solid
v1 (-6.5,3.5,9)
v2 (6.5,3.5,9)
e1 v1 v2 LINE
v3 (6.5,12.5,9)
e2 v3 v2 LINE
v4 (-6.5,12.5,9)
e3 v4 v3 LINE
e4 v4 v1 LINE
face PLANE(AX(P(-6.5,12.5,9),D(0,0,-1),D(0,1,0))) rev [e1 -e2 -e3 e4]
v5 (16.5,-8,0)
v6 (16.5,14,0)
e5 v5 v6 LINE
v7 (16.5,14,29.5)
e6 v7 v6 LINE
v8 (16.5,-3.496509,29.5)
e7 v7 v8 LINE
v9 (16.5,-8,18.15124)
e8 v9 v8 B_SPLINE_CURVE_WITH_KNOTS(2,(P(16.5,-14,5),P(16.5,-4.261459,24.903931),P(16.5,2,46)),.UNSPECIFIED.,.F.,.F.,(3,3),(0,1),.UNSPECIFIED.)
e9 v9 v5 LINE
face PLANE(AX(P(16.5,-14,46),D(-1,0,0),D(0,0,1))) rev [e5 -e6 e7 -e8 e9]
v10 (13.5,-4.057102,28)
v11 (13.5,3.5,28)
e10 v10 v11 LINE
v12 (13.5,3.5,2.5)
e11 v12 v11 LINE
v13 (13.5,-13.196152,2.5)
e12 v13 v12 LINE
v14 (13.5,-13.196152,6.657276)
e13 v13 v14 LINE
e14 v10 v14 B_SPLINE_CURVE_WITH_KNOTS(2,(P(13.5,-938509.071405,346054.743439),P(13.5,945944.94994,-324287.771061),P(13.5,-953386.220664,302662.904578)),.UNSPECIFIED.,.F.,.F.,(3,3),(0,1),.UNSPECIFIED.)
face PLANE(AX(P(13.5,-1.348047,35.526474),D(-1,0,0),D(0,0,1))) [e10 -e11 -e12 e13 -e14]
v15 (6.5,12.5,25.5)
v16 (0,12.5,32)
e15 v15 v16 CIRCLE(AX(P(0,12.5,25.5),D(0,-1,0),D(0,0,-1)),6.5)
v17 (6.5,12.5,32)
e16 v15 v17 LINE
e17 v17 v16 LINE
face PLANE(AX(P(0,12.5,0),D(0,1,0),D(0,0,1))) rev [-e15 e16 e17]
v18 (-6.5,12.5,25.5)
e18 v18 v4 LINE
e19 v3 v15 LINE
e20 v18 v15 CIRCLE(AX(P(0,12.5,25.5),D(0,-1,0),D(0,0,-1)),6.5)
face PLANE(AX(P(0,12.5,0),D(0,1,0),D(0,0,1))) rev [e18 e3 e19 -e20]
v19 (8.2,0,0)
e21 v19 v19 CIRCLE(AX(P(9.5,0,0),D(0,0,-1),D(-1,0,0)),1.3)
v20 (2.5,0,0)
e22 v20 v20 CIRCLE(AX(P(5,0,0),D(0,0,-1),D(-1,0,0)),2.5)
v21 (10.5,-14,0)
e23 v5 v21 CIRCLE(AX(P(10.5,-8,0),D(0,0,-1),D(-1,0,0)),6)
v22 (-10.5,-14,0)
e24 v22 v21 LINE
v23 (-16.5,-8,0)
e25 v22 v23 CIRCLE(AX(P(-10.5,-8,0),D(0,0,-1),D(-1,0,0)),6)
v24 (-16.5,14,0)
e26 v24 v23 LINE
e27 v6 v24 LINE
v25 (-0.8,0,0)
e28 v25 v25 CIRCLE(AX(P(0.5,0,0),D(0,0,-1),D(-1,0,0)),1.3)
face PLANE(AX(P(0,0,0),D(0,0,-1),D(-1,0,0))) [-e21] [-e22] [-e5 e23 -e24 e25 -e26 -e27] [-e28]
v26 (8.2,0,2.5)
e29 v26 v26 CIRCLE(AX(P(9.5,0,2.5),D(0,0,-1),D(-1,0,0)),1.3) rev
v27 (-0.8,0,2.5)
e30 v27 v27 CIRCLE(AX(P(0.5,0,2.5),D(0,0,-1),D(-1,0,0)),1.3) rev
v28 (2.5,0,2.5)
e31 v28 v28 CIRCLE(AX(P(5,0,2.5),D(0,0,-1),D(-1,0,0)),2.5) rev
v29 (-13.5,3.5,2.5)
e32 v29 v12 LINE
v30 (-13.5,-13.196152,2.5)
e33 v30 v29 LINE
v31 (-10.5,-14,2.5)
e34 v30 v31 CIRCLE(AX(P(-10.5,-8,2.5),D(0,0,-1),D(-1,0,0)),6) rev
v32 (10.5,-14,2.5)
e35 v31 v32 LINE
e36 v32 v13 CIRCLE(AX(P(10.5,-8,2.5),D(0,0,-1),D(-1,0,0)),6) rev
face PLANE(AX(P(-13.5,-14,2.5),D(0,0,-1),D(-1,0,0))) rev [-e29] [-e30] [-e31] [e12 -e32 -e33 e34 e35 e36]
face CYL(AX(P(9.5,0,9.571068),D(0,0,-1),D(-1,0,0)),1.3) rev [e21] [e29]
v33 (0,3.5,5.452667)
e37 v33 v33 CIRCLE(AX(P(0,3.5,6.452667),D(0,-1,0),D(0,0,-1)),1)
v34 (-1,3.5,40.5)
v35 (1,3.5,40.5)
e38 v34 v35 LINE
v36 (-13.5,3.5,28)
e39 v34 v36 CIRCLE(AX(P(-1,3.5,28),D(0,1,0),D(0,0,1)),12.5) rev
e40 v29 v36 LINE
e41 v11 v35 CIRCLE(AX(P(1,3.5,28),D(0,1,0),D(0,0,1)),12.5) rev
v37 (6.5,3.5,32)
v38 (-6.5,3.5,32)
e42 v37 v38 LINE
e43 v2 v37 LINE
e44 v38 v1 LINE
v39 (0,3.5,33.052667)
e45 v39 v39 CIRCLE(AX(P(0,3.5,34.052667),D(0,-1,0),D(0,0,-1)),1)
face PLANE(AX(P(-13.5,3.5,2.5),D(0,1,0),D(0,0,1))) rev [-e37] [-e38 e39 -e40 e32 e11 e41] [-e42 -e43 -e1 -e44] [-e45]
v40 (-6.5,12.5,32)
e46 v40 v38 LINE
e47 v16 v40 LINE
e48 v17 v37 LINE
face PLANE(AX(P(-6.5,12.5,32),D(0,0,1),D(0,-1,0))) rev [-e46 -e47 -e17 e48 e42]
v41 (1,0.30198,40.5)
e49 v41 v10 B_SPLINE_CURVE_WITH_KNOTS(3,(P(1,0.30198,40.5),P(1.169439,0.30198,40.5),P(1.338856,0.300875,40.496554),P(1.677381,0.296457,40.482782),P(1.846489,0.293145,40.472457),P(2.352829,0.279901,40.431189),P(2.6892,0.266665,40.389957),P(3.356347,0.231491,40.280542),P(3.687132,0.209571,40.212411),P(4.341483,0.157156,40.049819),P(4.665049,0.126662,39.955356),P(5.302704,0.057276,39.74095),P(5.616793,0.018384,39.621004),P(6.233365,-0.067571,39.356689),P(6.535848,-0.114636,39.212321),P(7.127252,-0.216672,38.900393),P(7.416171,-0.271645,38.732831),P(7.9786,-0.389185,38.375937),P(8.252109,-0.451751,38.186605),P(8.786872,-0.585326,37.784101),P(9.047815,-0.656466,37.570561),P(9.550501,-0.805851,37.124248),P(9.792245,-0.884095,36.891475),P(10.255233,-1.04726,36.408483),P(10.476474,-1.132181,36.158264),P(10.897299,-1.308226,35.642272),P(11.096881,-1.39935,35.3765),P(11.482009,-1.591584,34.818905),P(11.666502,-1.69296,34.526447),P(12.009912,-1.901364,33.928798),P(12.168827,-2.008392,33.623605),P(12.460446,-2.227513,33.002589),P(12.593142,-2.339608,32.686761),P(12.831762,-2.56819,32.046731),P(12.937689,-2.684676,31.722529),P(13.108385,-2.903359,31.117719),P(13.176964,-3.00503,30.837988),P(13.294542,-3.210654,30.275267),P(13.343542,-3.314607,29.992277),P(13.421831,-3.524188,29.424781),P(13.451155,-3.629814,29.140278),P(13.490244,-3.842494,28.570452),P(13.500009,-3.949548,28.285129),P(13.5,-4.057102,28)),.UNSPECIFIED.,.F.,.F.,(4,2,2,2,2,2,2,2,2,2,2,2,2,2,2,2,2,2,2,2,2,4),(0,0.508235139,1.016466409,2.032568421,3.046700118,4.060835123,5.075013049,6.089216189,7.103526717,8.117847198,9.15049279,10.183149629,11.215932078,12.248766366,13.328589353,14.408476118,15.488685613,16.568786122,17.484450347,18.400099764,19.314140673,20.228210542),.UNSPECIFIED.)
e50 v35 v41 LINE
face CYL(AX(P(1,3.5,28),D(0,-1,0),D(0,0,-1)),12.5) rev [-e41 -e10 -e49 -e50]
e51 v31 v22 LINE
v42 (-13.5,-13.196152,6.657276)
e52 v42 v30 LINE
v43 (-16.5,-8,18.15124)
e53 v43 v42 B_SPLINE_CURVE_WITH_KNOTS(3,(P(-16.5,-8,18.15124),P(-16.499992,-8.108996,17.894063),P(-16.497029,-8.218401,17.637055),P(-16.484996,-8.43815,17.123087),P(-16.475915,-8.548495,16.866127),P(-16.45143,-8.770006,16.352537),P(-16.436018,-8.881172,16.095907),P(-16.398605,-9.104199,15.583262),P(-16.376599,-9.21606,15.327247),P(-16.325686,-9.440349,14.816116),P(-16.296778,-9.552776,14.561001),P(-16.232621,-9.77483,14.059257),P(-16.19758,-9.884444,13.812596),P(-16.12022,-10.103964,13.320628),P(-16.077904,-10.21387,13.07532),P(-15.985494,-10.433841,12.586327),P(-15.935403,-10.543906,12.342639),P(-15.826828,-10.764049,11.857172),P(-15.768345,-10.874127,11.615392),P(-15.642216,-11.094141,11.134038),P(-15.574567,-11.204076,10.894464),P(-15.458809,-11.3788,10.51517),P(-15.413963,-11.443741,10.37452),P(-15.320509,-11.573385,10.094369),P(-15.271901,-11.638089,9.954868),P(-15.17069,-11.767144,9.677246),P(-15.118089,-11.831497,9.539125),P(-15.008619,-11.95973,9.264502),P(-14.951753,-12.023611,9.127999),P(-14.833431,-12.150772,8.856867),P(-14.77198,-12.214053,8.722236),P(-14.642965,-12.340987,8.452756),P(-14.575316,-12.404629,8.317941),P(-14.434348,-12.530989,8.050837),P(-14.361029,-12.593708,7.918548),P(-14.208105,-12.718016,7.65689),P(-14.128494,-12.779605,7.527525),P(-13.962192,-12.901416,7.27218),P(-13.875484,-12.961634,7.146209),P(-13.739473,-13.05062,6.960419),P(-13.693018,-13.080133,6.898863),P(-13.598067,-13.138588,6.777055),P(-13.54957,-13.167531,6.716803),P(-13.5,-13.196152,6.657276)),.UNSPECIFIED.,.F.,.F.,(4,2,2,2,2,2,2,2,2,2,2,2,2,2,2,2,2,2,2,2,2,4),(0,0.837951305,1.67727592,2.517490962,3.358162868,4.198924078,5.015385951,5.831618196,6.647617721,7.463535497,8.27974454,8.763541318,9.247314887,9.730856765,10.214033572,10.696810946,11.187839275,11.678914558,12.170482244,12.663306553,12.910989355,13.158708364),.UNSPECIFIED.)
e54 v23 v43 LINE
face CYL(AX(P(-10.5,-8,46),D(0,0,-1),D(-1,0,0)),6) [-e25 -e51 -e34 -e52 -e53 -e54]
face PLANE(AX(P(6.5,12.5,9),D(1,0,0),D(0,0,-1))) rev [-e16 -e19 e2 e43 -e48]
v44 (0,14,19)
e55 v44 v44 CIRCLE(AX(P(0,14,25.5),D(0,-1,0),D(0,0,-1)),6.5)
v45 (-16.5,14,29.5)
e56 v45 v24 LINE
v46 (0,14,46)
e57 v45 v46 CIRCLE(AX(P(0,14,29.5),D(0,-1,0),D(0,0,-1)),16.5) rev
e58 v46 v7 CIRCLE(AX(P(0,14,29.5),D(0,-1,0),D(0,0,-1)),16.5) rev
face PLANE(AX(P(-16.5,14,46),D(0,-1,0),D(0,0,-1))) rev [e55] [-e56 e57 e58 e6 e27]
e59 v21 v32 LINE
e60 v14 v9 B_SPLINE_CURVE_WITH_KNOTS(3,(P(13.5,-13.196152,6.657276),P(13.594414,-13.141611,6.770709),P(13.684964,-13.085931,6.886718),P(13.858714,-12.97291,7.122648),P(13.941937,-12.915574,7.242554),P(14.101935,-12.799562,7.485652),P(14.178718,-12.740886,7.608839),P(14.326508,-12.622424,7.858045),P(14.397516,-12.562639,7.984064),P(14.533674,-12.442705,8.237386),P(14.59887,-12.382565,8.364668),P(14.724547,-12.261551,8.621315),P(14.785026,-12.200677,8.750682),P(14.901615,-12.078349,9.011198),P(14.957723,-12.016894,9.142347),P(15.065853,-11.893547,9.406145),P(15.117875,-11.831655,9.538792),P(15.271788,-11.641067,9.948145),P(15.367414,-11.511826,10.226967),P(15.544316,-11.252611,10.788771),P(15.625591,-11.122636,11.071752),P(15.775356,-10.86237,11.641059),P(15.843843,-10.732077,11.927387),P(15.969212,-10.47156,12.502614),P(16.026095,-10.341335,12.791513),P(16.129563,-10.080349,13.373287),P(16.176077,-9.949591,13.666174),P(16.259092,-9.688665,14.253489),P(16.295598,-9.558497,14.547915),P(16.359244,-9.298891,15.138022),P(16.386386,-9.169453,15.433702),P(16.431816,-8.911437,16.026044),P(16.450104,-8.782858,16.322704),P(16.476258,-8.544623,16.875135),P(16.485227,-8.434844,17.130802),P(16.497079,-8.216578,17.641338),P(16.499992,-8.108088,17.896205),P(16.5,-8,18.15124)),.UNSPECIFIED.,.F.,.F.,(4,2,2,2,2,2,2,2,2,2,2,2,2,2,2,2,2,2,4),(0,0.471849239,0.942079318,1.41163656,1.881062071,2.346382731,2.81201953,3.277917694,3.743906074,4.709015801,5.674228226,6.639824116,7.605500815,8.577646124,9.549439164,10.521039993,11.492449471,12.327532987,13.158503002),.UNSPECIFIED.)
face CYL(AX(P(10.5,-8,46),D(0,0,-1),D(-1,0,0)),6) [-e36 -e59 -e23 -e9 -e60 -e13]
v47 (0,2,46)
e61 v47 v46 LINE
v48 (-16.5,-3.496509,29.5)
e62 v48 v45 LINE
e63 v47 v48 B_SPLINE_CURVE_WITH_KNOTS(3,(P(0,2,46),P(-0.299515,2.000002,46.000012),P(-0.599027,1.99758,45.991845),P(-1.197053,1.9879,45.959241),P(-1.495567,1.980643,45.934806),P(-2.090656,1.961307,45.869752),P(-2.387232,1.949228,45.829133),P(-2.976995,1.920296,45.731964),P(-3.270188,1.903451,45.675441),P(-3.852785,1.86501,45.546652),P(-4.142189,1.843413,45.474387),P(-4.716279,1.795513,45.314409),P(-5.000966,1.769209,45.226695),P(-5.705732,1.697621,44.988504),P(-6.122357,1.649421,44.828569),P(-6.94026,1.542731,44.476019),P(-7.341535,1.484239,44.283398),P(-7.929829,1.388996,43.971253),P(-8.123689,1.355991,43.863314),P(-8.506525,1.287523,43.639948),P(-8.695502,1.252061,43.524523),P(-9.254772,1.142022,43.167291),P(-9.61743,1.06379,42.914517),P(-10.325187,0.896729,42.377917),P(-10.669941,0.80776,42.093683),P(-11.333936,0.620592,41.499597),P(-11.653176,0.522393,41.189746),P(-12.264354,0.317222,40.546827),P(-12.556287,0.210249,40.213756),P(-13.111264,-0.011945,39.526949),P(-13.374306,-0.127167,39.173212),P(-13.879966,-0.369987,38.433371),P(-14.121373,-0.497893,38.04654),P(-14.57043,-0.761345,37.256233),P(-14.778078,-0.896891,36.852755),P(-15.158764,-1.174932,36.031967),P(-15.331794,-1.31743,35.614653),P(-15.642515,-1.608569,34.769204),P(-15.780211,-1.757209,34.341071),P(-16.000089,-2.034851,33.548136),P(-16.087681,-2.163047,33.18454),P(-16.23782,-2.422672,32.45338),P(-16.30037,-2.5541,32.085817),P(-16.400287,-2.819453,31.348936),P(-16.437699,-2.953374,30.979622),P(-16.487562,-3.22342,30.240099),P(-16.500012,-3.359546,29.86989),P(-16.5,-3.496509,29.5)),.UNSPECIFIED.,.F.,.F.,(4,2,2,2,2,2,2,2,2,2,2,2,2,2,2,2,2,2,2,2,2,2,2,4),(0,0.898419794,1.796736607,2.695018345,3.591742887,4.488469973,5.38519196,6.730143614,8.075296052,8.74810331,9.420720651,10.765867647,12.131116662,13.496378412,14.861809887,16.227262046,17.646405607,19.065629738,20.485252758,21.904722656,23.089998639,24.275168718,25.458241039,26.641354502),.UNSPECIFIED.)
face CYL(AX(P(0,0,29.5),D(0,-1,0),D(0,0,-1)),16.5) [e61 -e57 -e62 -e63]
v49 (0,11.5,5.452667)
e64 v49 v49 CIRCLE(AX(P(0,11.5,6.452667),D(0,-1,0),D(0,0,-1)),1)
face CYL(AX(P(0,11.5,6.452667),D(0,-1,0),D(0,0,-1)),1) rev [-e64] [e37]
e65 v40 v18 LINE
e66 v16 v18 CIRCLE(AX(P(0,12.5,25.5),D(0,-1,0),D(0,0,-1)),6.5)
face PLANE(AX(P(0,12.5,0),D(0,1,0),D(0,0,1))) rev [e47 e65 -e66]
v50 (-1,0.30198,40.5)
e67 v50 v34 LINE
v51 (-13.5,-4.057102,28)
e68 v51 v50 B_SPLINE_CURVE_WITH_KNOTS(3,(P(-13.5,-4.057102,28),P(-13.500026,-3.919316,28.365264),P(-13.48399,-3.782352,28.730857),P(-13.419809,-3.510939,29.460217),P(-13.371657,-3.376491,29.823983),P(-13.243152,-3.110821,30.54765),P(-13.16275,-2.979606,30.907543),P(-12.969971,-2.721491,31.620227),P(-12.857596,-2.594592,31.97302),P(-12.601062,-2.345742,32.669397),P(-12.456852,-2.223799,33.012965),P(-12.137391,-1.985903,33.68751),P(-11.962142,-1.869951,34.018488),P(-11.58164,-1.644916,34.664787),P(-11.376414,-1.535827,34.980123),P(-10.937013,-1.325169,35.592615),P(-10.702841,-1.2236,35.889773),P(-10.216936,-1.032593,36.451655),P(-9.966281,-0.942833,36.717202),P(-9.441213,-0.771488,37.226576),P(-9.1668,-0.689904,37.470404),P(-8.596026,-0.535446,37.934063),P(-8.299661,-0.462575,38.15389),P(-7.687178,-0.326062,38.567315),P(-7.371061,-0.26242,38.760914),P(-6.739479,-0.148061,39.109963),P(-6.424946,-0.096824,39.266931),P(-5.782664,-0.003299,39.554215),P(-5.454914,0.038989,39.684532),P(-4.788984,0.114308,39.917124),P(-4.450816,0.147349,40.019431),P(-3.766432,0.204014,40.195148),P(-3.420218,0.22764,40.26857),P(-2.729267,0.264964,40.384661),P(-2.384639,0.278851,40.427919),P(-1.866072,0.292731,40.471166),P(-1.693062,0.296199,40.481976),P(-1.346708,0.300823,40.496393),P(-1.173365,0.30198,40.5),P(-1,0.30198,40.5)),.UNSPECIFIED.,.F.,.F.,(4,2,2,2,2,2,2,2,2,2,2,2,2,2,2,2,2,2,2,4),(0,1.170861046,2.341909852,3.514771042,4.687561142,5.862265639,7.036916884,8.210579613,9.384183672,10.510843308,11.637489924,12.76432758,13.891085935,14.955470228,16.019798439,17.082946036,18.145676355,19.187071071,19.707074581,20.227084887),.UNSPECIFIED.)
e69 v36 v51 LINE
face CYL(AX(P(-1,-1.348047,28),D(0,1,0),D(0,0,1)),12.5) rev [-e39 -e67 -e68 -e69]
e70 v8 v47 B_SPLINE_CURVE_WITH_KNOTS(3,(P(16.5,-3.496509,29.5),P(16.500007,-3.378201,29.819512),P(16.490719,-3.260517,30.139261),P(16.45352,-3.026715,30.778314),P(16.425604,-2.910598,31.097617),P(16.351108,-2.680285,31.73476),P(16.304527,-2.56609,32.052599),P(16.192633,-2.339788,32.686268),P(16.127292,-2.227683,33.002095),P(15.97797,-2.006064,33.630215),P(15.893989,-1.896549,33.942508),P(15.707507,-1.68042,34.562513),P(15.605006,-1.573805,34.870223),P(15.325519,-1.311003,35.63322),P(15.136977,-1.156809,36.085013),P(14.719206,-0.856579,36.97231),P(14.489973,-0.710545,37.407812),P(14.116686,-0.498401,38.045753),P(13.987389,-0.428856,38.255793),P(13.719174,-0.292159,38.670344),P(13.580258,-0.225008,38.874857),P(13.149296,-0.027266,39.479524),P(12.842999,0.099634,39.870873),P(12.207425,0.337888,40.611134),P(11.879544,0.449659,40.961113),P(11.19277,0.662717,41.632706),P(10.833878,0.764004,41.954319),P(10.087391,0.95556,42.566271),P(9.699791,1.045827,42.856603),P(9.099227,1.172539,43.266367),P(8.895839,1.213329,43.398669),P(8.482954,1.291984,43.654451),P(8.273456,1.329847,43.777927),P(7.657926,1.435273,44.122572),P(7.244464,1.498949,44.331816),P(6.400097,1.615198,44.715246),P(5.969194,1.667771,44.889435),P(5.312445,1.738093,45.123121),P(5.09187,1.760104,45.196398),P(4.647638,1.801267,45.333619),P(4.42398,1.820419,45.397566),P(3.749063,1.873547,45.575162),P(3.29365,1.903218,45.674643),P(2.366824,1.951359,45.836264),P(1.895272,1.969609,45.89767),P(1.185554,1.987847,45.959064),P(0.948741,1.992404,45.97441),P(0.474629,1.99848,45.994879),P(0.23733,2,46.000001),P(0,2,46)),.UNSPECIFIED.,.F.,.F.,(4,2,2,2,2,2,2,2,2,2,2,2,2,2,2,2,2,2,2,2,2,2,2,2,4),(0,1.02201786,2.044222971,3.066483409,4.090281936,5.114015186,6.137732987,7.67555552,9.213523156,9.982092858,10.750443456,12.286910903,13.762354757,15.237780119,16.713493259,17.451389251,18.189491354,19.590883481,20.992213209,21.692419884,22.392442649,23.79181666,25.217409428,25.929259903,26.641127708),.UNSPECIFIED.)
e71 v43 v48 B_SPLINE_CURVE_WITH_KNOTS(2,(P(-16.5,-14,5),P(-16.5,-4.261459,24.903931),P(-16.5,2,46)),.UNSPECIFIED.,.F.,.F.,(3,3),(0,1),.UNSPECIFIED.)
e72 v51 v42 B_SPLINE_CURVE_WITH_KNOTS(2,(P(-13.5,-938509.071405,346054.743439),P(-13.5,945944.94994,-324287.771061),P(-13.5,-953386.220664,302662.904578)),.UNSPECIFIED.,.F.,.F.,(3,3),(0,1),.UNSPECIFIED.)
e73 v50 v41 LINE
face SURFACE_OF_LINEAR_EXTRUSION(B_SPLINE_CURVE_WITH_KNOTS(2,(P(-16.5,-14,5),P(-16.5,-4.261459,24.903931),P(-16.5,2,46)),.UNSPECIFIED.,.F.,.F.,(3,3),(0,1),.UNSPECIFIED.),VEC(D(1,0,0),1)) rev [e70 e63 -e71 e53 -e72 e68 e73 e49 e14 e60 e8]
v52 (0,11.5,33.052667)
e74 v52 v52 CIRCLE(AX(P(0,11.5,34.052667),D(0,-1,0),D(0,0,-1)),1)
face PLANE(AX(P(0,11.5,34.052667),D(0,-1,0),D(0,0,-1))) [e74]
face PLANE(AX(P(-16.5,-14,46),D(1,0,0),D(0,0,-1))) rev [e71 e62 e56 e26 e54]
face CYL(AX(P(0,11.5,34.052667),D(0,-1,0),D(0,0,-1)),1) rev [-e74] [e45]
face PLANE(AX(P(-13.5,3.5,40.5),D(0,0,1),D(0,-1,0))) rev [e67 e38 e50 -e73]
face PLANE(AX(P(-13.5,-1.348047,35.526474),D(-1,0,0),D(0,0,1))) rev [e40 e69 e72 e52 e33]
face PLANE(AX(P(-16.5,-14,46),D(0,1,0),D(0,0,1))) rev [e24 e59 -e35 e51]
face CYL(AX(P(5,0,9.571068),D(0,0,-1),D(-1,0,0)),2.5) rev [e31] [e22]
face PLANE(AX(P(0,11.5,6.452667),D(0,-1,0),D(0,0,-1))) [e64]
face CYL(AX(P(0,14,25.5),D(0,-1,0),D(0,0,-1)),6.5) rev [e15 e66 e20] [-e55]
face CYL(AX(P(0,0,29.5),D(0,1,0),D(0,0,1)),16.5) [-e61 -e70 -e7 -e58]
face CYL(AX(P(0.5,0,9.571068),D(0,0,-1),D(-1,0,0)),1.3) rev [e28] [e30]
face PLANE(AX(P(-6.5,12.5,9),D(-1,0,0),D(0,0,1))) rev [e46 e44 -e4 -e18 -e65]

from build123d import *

# Parameters (mm, degrees)
SKETCH1_W           = 33
SKETCH1_H           = 28
BOSS_EXTRUDE1_DEPTH = 46
CUT_EXTRUDE1_DEPTH  = 59.318093247
CUT_EXTRUDE2_START  = -3
CUT_EXTRUDE2_DEPTH  = 27
FILLET2_R           = 12.5
FILLET3_R           = 16.5
FILLET4_R           = 6
SKETCH5_W           = 13
SKETCH5_H           = 23
CUT_EXTRUDE3_DEPTH  = 9
SKETCH6_R           = 6.5
CUT_EXTRUDE4_DEPTH  = 56.592265809
SKETCH7_R           = 1
CUT_EXTRUDE6_DEPTH  = 8
SKETCH8_R           = 1.3
SKETCH8_R_2         = 2.5
CUT_EXTRUDE7_DEPTH  = 2.5


with BuildPart() as part:
    # Sketch1 → Boss-Extrude1 (new body)
    with BuildSketch(Plane.XY):
        Rectangle(SKETCH1_W, SKETCH1_H)
    extrude(amount=BOSS_EXTRUDE1_DEPTH)

    # Sketch2 → Cut-Extrude1 (cut, through all)
    with BuildSketch(Plane(origin=(16.5, 0, 0), x_dir=(0, 0, -1), z_dir=(1, 0, 0))):
        with BuildLine():
            Line((-46, 2), (-46, -14))
            Line((-46, -14), (-5, -14))
            add(Edge.make_bspline(
                [(-5, -14), (-24.903930892, -4.26145895), (-46, 2)],
                knots=[0, 0, 0, 1, 1, 1], degree=2))
        make_face()
    extrude(amount=-CUT_EXTRUDE1_DEPTH, mode=Mode.SUBTRACT)

    # Sketch4 → Cut-Extrude2 (cut)
    with BuildSketch(Plane(origin=(16.5, 0, 0), x_dir=(0, 0, -1), z_dir=(1, 0, 0)).offset(CUT_EXTRUDE2_START)):
        with BuildLine():
            Line((-5, -14), (-2.5, -14))
            Line((-2.5, -14), (-2.5, 3.5))
            Line((-2.5, 3.5), (-40.5, 3.5))
            Line((-40.5, 3.5), (-40.5, 0.301980422))
            add(Edge.make_bspline(
                [(-5, -14), (-22.299705813, -5.535647097), (-40.5, 0.301980422)],
                knots=[0, 0, 0, 1, 1, 1], degree=2))
        make_face()
    extrude(amount=-CUT_EXTRUDE2_DEPTH, mode=Mode.SUBTRACT)

    # Fillet2
    fillet2_edges = [part.edges().sort_by_distance(p)[0] for p in [
        (-13.5, 1.900990211, 40.5),
        (13.5, 1.900990211, 40.5),
    ]]
    fillet(fillet2_edges, radius=FILLET2_R)

    # Fillet3
    fillet3_edges = [part.edges().sort_by_distance(p)[0] for p in [
        (-16.5, 8, 46),
        (16.5, 8, 46),
    ]]
    fillet(fillet3_edges, radius=FILLET3_R - 0.0001)  # a hair under: the kernel refuses the full size

    # Fillet4
    fillet4_edges = [part.edges().sort_by_distance(p)[0] for p in [
        (-16.5, -14, 2.5),
        (16.5, -14, 2.5),
    ]]
    fillet(fillet4_edges, radius=FILLET4_R)

    # Sketch5 → Cut-Extrude3 (cut)
    with BuildSketch(Plane.XZ.offset(-3.5)):
        with Locations((0, 20.5)):
            Rectangle(SKETCH5_W, SKETCH5_H)
    extrude(amount=-CUT_EXTRUDE3_DEPTH, mode=Mode.SUBTRACT)

    # Sketch6 → Cut-Extrude4 (cut, through all)
    with BuildSketch(Plane.XZ.offset(-12.5)):
        with Locations(Location((0, 25.5, 0), (0, 0, 270))):
            Circle(SKETCH6_R)
    extrude(amount=-CUT_EXTRUDE4_DEPTH, mode=Mode.SUBTRACT)

    # Sketch7 → Cut-Extrude6 (cut)
    with BuildSketch(Plane.XZ.offset(-3.5)):
        with Locations(Location((0, 34.052667497, 0), (0, 0, 270))):
            Circle(SKETCH7_R)
        with Locations(Location((0, 6.452667497, 0), (0, 0, 270))):
            Circle(SKETCH7_R)
    extrude(amount=-CUT_EXTRUDE6_DEPTH, mode=Mode.SUBTRACT)

    # Sketch8 → Cut-Extrude7 (cut)
    with BuildSketch(Plane(origin=(0, 0, 0), x_dir=(-1, 0, 0), z_dir=(0, 0, -1))):
        with Locations((-9.5, 0)):
            Circle(SKETCH8_R)
        with Locations((-5, 0)):
            Circle(SKETCH8_R_2)
        with Locations((-0.5, 0)):
            Circle(SKETCH8_R)
    extrude(amount=-CUT_EXTRUDE7_DEPTH, mode=Mode.SUBTRACT)


solid = part.part
